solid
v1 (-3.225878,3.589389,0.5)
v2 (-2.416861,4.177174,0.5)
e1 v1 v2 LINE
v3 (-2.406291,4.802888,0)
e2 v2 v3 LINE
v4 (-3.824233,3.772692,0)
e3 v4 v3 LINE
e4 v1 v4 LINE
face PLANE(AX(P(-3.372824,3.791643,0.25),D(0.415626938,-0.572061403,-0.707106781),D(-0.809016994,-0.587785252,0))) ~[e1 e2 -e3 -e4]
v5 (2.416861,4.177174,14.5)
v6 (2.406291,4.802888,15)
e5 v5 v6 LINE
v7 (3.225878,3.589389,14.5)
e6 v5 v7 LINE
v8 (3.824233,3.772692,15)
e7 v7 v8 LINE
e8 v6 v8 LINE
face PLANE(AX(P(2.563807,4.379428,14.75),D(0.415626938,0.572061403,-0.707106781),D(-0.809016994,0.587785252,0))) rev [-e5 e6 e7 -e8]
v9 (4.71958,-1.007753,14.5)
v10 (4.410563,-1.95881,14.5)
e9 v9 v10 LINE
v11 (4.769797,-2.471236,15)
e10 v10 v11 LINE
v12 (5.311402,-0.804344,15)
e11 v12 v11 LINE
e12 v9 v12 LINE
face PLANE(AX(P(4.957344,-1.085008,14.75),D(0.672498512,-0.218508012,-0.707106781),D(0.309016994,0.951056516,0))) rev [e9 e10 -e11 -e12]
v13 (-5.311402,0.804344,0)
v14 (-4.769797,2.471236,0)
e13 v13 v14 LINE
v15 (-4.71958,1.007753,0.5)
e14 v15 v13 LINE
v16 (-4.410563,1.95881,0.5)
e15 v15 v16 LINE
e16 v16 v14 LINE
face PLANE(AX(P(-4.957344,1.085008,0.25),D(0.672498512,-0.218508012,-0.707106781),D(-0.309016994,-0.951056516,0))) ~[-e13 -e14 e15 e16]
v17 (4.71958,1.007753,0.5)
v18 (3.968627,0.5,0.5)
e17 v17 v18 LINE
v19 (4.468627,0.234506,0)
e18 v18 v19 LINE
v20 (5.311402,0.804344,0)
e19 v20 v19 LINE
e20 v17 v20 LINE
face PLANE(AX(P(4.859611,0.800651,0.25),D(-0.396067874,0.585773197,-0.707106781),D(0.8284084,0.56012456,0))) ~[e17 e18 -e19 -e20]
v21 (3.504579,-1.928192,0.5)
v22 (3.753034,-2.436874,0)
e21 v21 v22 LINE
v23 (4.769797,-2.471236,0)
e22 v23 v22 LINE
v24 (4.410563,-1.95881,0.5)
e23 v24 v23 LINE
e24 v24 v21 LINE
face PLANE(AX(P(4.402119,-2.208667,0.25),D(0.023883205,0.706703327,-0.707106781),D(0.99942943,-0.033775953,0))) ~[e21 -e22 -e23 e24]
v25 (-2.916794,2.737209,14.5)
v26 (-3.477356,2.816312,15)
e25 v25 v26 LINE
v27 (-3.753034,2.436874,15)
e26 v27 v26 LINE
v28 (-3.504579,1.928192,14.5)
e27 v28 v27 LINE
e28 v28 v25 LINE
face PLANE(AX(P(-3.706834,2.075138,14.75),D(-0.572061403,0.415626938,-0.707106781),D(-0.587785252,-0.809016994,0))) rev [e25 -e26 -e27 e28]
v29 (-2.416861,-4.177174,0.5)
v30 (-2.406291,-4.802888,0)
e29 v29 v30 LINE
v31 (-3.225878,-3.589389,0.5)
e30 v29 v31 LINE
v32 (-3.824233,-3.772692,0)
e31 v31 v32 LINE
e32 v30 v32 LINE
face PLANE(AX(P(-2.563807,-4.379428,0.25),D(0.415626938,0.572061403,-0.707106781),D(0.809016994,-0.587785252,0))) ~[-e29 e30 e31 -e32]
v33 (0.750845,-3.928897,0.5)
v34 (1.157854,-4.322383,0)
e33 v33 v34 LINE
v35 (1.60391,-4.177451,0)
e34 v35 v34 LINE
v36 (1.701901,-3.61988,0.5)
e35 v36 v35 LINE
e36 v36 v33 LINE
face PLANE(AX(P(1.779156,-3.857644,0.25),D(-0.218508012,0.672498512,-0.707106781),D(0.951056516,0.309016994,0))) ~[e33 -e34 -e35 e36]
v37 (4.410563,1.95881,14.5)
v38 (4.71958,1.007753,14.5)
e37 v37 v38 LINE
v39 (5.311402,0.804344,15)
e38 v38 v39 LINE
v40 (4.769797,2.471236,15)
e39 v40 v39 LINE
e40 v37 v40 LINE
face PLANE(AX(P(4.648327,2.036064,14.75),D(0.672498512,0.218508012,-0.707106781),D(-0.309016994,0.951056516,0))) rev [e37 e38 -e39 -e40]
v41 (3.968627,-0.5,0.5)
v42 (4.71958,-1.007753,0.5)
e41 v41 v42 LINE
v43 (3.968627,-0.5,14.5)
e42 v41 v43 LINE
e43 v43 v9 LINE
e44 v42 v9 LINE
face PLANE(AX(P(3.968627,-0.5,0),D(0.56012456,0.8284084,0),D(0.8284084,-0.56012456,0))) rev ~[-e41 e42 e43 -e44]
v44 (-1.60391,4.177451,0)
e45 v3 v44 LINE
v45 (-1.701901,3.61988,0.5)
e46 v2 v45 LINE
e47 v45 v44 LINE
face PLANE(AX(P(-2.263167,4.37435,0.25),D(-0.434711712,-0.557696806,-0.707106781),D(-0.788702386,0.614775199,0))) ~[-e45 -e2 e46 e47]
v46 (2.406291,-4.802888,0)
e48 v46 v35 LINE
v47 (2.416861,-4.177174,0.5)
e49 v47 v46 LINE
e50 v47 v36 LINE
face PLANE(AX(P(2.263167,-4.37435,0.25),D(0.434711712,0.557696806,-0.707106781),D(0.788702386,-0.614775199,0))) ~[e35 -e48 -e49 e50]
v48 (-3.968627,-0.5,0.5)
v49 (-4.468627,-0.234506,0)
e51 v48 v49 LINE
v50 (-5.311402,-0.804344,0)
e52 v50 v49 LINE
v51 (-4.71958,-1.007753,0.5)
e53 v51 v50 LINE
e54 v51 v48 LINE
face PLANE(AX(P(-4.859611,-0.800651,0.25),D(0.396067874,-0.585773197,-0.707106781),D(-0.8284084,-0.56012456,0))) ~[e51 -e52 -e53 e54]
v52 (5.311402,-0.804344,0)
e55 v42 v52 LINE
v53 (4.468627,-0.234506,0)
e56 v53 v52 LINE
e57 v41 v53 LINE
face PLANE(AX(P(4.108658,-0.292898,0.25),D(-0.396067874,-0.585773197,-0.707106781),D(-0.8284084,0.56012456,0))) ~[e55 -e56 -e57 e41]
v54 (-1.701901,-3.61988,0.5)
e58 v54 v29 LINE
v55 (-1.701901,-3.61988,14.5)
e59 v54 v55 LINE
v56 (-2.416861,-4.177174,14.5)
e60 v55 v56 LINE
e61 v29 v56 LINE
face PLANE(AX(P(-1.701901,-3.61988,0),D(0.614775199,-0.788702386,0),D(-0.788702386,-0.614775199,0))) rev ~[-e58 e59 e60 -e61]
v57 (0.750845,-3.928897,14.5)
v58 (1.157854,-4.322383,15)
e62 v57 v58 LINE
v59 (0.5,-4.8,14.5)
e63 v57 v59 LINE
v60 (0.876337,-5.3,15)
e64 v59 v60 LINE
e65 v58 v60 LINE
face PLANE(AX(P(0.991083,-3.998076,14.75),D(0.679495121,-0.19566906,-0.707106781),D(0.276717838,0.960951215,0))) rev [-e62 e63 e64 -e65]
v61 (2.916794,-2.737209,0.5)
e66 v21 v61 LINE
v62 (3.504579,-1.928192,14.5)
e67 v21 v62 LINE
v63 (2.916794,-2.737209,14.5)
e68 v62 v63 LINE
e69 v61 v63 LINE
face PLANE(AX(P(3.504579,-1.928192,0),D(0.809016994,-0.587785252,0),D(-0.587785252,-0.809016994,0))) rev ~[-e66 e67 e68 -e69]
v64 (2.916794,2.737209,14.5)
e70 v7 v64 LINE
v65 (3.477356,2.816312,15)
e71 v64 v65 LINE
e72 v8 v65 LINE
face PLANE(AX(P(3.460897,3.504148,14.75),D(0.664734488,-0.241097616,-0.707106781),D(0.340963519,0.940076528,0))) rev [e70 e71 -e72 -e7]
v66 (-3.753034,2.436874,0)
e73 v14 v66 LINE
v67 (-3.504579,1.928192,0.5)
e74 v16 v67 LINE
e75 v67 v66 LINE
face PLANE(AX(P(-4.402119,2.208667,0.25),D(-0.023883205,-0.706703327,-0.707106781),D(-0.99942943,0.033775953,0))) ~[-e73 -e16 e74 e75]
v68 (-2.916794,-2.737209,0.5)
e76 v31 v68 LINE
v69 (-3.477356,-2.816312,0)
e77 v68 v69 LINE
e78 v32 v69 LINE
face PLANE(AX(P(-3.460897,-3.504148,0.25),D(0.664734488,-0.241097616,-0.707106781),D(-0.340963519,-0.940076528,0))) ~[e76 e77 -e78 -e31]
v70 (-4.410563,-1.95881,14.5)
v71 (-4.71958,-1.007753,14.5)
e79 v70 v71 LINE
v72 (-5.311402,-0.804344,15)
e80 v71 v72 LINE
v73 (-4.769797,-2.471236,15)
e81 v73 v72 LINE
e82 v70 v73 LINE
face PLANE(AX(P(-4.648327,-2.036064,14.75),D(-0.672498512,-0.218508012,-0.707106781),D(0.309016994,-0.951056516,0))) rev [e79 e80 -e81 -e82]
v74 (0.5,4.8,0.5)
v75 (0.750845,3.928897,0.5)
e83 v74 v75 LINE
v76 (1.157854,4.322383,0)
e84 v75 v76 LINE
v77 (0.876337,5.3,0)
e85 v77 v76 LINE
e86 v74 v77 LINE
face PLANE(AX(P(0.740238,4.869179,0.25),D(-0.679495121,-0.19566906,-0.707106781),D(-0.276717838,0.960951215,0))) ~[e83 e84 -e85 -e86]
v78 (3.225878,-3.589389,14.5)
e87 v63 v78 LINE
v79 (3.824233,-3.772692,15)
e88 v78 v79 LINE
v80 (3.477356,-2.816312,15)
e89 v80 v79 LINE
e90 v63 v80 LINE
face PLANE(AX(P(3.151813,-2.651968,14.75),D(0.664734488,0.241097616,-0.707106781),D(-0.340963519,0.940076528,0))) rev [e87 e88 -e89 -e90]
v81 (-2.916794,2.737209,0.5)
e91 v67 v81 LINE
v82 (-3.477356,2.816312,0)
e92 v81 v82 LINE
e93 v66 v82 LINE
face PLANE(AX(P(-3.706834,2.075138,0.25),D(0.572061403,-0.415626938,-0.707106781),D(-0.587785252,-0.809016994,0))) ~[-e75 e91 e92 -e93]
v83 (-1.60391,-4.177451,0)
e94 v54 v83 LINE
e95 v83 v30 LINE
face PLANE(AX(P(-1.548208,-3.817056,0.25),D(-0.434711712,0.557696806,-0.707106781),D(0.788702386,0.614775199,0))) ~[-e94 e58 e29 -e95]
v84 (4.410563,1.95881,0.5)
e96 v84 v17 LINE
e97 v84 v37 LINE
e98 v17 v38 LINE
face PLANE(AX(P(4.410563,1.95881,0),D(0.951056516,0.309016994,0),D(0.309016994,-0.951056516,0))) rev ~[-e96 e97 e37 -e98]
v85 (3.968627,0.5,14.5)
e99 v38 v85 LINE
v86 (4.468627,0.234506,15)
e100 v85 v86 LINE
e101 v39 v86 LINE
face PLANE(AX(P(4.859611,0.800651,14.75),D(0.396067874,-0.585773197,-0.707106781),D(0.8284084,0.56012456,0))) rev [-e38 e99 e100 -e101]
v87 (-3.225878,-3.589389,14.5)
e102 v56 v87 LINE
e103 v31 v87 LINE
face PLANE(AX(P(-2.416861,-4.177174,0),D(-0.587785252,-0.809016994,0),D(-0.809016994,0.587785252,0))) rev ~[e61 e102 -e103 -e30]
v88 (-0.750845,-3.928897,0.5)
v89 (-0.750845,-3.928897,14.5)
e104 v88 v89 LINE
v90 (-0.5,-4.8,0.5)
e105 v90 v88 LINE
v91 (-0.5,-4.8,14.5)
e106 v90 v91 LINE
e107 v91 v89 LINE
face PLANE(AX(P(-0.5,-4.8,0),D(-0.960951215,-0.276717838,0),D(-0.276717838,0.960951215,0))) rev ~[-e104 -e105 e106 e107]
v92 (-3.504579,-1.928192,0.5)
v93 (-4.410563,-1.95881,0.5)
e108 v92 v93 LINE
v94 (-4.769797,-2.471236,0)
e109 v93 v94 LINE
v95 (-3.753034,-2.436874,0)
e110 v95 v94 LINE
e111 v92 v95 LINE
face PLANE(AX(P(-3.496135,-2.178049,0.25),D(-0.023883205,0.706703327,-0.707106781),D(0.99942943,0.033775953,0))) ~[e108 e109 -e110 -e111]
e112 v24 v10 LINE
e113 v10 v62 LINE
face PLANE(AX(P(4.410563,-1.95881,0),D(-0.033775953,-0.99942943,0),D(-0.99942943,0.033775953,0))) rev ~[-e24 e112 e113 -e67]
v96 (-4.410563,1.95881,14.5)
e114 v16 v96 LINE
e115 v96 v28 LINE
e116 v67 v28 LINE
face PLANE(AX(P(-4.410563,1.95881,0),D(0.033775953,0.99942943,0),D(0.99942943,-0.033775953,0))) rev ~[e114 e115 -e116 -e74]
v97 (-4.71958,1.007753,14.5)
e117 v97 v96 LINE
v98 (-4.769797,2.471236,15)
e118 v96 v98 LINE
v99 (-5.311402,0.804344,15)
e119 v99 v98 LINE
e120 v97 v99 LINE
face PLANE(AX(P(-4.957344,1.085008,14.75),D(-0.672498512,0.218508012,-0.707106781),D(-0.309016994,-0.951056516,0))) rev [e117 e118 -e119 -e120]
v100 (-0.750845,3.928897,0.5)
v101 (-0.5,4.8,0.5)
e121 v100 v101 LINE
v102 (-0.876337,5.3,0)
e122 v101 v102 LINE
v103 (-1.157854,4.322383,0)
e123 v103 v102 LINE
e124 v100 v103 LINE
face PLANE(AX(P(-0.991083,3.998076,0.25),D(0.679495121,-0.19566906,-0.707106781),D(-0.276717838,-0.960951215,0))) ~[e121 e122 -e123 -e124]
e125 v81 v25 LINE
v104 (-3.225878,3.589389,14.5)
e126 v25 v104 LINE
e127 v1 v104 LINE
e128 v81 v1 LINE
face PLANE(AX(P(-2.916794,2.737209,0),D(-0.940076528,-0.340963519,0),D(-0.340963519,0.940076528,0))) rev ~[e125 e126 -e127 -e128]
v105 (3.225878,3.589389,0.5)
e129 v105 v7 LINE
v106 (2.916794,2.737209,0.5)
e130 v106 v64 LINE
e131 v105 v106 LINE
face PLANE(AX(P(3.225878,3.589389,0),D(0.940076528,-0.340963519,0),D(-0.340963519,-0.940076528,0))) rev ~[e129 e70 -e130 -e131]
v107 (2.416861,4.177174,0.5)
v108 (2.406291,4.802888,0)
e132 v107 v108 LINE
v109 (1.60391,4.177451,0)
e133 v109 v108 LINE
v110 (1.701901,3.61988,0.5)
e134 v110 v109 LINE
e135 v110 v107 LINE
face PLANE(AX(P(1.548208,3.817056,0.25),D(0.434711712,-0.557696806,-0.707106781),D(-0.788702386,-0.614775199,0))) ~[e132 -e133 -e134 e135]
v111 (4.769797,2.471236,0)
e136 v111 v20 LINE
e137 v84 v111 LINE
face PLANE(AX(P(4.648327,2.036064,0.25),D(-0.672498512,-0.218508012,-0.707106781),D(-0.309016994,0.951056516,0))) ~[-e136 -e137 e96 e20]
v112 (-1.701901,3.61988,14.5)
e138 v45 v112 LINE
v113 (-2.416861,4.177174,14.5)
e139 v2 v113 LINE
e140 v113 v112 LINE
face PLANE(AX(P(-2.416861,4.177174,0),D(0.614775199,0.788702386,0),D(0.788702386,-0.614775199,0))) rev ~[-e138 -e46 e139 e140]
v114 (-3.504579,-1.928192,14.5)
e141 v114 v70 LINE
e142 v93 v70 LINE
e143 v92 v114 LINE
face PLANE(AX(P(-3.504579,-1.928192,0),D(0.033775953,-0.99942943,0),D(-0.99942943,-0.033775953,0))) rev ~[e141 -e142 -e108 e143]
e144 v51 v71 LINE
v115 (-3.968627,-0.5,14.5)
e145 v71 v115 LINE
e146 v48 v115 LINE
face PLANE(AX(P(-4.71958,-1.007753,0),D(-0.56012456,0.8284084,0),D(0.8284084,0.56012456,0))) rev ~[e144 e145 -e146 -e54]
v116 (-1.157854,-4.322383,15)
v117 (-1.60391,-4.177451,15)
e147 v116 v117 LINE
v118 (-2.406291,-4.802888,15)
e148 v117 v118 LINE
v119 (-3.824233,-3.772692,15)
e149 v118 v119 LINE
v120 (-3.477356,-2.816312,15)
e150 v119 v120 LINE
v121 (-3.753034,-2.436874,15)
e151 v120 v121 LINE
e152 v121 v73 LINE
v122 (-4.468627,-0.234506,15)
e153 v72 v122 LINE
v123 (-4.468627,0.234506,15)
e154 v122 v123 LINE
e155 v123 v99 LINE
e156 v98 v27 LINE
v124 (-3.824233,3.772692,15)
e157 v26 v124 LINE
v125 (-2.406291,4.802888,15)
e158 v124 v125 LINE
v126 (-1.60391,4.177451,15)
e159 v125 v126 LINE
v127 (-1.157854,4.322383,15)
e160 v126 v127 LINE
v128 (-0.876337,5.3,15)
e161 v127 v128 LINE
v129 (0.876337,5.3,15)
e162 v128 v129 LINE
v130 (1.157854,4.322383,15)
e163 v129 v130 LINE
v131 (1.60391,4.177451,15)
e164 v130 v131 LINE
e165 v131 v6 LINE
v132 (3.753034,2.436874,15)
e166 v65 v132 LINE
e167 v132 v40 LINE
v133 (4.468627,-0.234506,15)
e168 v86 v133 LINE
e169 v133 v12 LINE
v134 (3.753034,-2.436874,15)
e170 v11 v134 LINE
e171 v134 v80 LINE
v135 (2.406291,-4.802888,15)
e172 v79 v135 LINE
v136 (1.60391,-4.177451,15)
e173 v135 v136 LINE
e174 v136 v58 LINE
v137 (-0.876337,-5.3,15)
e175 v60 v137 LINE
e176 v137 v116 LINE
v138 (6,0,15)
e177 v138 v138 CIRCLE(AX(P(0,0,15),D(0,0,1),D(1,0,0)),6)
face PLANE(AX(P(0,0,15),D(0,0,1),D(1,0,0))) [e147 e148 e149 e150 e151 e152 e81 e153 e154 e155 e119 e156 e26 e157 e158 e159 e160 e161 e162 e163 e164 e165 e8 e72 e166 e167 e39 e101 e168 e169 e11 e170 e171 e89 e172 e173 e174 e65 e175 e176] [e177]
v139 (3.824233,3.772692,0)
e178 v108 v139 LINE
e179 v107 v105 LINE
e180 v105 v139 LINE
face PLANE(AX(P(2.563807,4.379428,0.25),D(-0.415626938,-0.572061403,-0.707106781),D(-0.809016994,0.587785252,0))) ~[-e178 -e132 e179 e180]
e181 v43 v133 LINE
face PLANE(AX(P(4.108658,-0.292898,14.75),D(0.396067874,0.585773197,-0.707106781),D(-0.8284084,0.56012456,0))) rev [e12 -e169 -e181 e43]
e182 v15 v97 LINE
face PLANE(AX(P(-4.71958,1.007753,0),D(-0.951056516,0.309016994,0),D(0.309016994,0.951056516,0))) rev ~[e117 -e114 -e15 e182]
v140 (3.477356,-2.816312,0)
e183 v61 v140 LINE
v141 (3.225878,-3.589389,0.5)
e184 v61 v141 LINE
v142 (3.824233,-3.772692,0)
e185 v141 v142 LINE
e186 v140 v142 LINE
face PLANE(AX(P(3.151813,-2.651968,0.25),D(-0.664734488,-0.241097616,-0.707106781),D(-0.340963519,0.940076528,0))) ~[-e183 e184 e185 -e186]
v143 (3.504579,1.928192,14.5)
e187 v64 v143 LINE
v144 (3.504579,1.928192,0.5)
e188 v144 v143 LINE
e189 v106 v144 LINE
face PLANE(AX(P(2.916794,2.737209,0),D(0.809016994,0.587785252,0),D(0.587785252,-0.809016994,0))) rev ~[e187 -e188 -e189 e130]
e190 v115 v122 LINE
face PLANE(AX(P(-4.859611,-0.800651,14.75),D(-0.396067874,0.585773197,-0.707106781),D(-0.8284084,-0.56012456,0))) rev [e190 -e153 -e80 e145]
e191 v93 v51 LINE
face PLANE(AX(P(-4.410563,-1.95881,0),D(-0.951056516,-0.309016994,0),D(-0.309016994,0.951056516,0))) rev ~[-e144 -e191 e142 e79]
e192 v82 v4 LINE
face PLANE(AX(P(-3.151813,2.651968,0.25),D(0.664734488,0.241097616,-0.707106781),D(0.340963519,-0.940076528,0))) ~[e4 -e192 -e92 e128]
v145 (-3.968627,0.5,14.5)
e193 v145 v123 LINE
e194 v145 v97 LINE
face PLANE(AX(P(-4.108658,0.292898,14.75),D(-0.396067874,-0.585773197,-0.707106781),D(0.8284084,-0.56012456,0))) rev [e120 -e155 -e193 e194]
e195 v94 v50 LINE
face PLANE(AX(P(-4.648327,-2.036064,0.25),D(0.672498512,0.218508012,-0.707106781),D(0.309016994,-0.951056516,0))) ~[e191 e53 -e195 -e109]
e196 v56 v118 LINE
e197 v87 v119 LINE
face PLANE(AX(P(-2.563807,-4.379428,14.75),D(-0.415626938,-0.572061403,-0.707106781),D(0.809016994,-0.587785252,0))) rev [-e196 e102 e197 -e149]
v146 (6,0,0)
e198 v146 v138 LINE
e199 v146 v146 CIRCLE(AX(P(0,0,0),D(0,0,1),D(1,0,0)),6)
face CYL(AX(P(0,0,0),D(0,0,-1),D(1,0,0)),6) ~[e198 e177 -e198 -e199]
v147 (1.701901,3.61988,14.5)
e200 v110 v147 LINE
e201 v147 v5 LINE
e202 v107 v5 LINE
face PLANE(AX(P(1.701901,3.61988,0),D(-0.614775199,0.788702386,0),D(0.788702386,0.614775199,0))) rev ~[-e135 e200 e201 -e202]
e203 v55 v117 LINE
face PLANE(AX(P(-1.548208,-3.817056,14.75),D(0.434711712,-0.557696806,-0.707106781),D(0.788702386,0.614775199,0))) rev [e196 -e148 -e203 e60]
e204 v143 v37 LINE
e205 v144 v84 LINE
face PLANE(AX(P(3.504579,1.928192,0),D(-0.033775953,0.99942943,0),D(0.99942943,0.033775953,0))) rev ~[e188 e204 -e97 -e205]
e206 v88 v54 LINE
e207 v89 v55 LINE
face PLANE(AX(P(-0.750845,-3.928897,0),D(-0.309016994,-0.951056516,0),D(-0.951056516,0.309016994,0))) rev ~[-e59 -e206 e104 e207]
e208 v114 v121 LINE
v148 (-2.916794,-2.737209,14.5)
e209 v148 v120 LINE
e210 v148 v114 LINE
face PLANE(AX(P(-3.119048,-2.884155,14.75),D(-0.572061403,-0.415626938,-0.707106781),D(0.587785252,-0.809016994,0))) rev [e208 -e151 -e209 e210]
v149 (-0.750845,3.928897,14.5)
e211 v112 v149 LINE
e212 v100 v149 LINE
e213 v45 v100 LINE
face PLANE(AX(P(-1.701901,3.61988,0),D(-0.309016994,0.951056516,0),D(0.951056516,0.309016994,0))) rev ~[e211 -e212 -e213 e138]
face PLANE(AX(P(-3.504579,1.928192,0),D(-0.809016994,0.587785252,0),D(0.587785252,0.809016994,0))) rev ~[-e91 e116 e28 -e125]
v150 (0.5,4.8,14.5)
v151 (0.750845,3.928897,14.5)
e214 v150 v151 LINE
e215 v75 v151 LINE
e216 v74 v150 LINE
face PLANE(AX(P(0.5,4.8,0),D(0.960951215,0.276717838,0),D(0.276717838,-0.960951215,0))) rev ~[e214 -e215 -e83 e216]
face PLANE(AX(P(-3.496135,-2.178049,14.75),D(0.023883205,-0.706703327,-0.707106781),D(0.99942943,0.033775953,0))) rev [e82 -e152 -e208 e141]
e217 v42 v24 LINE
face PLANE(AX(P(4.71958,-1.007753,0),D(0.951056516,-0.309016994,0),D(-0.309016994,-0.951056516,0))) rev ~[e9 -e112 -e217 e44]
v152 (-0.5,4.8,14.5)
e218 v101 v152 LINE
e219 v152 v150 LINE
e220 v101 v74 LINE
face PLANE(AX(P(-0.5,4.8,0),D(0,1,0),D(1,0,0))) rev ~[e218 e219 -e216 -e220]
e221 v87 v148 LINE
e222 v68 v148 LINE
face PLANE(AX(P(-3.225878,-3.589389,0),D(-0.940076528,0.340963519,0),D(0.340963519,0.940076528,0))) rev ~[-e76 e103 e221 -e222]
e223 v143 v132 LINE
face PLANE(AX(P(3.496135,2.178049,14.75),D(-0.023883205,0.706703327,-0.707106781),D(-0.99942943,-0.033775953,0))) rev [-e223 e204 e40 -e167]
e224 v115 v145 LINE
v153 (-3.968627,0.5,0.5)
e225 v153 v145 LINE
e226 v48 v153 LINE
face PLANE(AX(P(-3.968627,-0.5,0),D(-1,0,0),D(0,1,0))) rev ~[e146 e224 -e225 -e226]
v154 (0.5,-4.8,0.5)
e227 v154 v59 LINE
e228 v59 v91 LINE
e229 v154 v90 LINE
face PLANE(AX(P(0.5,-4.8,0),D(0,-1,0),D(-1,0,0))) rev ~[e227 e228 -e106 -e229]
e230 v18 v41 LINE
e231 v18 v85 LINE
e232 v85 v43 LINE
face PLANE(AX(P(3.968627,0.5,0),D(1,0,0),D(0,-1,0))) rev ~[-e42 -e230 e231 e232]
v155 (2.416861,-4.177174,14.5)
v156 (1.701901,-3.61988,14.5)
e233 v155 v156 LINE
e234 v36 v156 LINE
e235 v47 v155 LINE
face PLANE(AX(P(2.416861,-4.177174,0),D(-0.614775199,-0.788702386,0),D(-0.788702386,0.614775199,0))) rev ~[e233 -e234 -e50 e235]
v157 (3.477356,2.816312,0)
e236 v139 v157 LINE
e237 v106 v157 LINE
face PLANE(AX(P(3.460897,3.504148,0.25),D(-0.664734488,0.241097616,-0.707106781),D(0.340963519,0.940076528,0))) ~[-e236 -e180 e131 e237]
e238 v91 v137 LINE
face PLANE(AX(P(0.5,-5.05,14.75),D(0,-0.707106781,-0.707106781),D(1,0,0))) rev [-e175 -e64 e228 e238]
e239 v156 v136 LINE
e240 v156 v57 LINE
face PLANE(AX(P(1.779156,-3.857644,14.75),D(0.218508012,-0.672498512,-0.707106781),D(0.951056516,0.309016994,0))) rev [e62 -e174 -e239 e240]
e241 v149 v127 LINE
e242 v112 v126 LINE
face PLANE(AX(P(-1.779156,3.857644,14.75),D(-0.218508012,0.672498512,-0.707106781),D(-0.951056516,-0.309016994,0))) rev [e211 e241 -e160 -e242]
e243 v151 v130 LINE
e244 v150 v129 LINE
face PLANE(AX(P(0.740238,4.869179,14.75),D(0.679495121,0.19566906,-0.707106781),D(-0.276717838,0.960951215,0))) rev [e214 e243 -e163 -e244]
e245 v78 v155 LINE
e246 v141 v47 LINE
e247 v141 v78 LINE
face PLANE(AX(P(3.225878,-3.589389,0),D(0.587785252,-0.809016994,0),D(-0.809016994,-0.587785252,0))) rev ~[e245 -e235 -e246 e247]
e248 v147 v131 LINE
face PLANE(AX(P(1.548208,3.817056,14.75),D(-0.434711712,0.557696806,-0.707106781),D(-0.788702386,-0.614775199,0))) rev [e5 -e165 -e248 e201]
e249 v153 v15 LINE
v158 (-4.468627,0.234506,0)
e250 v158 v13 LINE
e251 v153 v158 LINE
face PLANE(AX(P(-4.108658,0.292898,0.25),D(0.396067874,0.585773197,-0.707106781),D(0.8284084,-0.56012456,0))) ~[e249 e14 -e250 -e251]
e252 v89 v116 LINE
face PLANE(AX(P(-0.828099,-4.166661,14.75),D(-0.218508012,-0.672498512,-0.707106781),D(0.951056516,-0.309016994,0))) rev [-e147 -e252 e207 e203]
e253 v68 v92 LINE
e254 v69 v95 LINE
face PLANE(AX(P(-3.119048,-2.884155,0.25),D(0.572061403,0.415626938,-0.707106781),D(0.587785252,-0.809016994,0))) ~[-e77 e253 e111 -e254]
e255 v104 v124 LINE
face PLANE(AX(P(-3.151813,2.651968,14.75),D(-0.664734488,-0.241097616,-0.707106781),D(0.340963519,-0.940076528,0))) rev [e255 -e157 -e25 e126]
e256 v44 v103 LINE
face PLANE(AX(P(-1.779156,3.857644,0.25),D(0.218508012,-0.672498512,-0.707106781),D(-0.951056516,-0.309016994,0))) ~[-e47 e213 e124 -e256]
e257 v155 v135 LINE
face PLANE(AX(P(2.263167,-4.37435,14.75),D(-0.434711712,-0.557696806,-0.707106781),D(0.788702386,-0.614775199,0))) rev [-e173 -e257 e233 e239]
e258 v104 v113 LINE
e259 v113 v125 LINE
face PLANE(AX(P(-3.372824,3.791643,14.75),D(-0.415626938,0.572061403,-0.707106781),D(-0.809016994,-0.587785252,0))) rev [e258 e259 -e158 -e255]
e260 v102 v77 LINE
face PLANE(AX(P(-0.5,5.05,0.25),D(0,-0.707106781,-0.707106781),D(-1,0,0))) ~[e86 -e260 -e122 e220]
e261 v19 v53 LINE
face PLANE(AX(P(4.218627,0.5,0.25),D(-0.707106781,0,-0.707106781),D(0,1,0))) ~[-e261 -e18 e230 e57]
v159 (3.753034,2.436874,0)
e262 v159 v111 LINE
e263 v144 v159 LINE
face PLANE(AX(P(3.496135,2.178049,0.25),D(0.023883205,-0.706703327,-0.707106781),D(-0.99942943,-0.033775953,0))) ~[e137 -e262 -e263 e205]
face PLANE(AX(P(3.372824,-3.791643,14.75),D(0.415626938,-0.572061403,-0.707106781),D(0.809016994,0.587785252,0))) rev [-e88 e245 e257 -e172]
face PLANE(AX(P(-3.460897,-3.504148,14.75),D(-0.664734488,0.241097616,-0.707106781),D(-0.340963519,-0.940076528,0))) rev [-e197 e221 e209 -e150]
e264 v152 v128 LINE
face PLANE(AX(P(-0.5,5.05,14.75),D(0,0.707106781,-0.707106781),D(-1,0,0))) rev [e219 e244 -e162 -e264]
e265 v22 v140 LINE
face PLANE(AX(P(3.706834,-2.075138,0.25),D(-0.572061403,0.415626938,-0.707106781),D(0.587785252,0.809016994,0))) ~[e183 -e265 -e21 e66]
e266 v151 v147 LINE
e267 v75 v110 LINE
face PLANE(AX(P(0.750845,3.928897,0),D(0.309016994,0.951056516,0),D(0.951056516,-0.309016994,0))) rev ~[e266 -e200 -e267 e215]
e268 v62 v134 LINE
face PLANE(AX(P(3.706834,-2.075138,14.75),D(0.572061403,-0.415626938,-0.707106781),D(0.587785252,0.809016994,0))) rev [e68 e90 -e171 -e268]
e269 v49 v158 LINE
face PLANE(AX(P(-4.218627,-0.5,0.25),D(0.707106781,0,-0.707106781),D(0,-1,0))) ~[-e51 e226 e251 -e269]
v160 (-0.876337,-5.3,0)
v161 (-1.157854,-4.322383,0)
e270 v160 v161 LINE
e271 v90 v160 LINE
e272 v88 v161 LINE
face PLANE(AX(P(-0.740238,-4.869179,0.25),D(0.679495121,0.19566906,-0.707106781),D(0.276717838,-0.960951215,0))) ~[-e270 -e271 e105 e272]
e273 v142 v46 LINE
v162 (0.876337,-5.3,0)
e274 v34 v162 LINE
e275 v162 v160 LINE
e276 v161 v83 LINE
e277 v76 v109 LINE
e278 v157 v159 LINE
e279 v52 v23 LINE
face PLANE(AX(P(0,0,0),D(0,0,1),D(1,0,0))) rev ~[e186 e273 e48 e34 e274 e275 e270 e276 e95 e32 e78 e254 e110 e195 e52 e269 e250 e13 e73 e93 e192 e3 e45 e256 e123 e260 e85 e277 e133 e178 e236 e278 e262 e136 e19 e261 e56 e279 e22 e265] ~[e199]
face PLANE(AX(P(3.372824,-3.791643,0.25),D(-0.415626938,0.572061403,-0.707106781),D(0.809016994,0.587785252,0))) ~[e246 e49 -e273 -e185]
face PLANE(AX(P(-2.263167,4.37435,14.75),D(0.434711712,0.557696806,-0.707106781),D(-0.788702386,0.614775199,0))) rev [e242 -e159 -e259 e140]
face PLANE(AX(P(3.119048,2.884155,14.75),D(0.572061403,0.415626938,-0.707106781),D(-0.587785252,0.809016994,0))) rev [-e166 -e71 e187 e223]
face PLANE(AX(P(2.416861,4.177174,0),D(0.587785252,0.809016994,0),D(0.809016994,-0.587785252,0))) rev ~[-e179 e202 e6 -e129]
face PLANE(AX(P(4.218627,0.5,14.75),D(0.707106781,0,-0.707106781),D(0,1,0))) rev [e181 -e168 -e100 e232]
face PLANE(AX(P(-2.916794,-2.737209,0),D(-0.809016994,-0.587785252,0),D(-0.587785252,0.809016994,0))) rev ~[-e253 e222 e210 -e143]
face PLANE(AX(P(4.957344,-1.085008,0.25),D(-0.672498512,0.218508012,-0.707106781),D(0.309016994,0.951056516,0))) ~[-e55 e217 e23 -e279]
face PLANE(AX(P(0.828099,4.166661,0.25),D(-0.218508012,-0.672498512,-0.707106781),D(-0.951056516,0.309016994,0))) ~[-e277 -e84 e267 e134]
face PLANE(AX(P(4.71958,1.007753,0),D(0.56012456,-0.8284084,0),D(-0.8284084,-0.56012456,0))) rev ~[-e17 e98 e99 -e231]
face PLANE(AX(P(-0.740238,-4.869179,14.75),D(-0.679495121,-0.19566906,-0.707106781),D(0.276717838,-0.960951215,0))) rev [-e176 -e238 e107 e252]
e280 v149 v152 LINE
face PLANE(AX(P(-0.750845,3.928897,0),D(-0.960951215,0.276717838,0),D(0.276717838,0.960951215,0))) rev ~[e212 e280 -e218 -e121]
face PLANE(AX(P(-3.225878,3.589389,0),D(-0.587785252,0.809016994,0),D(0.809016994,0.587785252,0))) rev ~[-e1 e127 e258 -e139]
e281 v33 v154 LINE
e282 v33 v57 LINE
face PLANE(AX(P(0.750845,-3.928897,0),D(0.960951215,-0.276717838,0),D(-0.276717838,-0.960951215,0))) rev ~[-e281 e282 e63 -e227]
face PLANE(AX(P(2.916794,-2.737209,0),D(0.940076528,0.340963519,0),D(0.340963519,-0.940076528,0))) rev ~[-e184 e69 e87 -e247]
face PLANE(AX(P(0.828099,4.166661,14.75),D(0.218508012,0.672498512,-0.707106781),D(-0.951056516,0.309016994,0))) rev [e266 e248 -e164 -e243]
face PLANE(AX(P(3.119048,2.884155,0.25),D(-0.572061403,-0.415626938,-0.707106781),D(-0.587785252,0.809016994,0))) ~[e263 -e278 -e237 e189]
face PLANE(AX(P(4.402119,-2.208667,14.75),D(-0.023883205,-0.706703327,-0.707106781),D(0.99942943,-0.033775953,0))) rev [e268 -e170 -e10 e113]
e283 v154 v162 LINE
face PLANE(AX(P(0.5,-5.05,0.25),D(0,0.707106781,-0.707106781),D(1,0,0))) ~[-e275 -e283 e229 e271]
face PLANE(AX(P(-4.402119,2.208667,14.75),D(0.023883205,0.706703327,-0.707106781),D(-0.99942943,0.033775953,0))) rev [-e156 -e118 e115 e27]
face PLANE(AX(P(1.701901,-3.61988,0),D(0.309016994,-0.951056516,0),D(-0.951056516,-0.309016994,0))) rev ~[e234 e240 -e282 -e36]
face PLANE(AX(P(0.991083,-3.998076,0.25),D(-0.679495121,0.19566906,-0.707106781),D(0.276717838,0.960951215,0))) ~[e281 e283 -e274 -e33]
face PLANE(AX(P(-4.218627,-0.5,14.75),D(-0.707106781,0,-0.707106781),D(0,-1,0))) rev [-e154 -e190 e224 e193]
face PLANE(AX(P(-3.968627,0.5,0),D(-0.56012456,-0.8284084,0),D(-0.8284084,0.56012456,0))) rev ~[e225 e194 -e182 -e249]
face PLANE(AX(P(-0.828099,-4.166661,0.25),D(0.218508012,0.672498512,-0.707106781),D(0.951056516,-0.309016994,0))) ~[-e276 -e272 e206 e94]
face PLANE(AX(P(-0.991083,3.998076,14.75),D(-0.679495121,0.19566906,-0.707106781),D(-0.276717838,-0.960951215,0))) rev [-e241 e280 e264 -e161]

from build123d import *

# Parameters (mm, degrees)
F0_R     = 6
F1_DEPTH = 15
F2_SIZE  = 0.5


# Not quite as in the source:
# - a feature names something its author has since deleted; it is built from what else it names


with BuildPart() as f1:
    # F0 (on Top) → F1 (new body)
    with BuildSketch(Plane.XY):
        Circle(F0_R)
        Polygon((0.5, 4.8), (0.7508449189, 3.9288970345), (1.7019014352, 3.6198800401), (2.4168607138, 4.1771741991), (3.2258777082, 3.5893889469), (2.9167940342, 2.7372089), (3.5045792865, 1.9281919056), (4.410562781, 1.9588098311), (4.7195797754, 1.0077533149), (3.9686269666, 0.5), (3.9686269666, -0.5), (4.7195797754, -1.0077533149), (4.410562781, -1.9588098311), (3.5045792865, -1.9281919056), (2.9167940342, -2.7372089), (3.2258777082, -3.5893889469), (2.4168607138, -4.1771741991), (1.7019014352, -3.6198800401), (0.7508449189, -3.9288970345), (0.5, -4.8), (-0.5, -4.8), (-0.7508449189, -3.9288970345), (-1.7019014352, -3.6198800401), (-2.4168607138, -4.1771741991), (-3.2258777082, -3.5893889469), (-2.9167940342, -2.7372089), (-3.5045792865, -1.9281919056), (-4.410562781, -1.9588098311), (-4.7195797754, -1.0077533149), (-3.9686269666, -0.5), (-3.9686269666, 0.5), (-4.7195797754, 1.0077533149), (-4.410562781, 1.9588098311), (-3.5045792865, 1.9281919056), (-2.9167940342, 2.7372089), (-3.2258777082, 3.5893889469), (-2.4168607138, 4.1771741991), (-1.7019014352, 3.6198800401), (-0.7508449189, 3.9288970345), (-0.5, 4.8), align=None, mode=Mode.SUBTRACT)
    extrude(amount=F1_DEPTH)

    # F2
    f2_edges = [f1.edges().sort_by_distance(p)[0] for p in [
        (-3.071336, -3.163299, 15),
        (-1.226373, -3.774389, 15),
        (-4.565071, -1.483282, 15),
        (-4.565071, 1.483282, 15),
        (-2.821369, -3.883282, 15),
        (-4.344103, 0.753877, 15),
        (2.821369, 3.883282, 15),
        (-0.625422, -4.364449, 15),
        (-3.210687, -2.3327, 15),
        (-3.071336, 3.163299, 15),
        (1.226373, -3.774389, 15),
        (-4.344103, -0.753877, 15),
        (2.059381, 3.898527, 15),
        (3.071336, -3.163299, 15),
        (4.565071, 1.483282, 15),
        (3.957571, 1.943501, 15),
        (3.968627, 0, 15),
        (3.071336, 3.163299, 15),
        (4.344103, 0.753877, 15),
        (2.821369, -3.883282, 15),
        (3.210687, 2.3327, 15),
        (0.625422, 4.364449, 15),
        (-2.059381, 3.898527, 15),
        (0, 4.8, 15),
        (3.957571, -1.943501, 15),
        (2.059381, -3.898527, 15),
        (-3.210687, 2.3327, 15),
        (-0.625422, 4.364449, 15),
        (0.625422, -4.364449, 15),
        (-2.059381, -3.898527, 15),
        (4.344103, -0.753877, 15),
        (3.210687, -2.3327, 15),
        (0, -4.8, 15),
        (-3.968627, 0, 15),
        (-3.957571, -1.943501, 15),
        (4.565071, -1.483282, 15),
        (-2.821369, 3.883282, 15),
        (1.226373, 3.774389, 15),
        (-3.957571, 1.943501, 15),
        (-1.226373, 3.774389, 15),
        (-2.821369, -3.883282, 0),
        (2.821369, -3.883282, 0),
        (0, -4.8, 0),
        (4.344103, -0.753877, 0),
        (1.226373, -3.774389, 0),
        (-4.344103, 0.753877, 0),
        (2.821369, 3.883282, 0),
        (-0.625422, -4.364449, 0),
        (-3.968627, 0, 0),
        (3.957571, -1.943501, 0),
        (-4.565071, -1.483282, 0),
        (-3.071336, -3.163299, 0),
        (-3.071336, 3.163299, 0),
        (-1.226373, -3.774389, 0),
        (-2.059381, 3.898527, 0),
        (-4.565071, 1.483282, 0),
        (0.625422, 4.364449, 0),
        (3.210687, 2.3327, 0),
        (3.957571, 1.943501, 0),
        (1.226373, 3.774389, 0),
        (-3.210687, 2.3327, 0),
        (3.071336, -3.163299, 0),
        (-1.226373, 3.774389, 0),
        (0.625422, -4.364449, 0),
        (-2.821369, 3.883282, 0),
        (-4.344103, -0.753877, 0),
        (-2.059381, -3.898527, 0),
        (4.344103, 0.753877, 0),
        (-0.625422, 4.364449, 0),
        (-3.210687, -2.3327, 0),
        (-3.957571, 1.943501, 0),
        (4.565071, 1.483282, 0),
        (3.968627, 0, 0),
        (2.059381, 3.898527, 0),
        (2.059381, -3.898527, 0),
        (3.210687, -2.3327, 0),
        (0, 4.8, 0),
        (4.565071, -1.483282, 0),
        (3.071336, 3.163299, 0),
        (-3.957571, -1.943501, 0),
    ]]
    chamfer(f2_edges, length=F2_SIZE)


solid = f1.part
